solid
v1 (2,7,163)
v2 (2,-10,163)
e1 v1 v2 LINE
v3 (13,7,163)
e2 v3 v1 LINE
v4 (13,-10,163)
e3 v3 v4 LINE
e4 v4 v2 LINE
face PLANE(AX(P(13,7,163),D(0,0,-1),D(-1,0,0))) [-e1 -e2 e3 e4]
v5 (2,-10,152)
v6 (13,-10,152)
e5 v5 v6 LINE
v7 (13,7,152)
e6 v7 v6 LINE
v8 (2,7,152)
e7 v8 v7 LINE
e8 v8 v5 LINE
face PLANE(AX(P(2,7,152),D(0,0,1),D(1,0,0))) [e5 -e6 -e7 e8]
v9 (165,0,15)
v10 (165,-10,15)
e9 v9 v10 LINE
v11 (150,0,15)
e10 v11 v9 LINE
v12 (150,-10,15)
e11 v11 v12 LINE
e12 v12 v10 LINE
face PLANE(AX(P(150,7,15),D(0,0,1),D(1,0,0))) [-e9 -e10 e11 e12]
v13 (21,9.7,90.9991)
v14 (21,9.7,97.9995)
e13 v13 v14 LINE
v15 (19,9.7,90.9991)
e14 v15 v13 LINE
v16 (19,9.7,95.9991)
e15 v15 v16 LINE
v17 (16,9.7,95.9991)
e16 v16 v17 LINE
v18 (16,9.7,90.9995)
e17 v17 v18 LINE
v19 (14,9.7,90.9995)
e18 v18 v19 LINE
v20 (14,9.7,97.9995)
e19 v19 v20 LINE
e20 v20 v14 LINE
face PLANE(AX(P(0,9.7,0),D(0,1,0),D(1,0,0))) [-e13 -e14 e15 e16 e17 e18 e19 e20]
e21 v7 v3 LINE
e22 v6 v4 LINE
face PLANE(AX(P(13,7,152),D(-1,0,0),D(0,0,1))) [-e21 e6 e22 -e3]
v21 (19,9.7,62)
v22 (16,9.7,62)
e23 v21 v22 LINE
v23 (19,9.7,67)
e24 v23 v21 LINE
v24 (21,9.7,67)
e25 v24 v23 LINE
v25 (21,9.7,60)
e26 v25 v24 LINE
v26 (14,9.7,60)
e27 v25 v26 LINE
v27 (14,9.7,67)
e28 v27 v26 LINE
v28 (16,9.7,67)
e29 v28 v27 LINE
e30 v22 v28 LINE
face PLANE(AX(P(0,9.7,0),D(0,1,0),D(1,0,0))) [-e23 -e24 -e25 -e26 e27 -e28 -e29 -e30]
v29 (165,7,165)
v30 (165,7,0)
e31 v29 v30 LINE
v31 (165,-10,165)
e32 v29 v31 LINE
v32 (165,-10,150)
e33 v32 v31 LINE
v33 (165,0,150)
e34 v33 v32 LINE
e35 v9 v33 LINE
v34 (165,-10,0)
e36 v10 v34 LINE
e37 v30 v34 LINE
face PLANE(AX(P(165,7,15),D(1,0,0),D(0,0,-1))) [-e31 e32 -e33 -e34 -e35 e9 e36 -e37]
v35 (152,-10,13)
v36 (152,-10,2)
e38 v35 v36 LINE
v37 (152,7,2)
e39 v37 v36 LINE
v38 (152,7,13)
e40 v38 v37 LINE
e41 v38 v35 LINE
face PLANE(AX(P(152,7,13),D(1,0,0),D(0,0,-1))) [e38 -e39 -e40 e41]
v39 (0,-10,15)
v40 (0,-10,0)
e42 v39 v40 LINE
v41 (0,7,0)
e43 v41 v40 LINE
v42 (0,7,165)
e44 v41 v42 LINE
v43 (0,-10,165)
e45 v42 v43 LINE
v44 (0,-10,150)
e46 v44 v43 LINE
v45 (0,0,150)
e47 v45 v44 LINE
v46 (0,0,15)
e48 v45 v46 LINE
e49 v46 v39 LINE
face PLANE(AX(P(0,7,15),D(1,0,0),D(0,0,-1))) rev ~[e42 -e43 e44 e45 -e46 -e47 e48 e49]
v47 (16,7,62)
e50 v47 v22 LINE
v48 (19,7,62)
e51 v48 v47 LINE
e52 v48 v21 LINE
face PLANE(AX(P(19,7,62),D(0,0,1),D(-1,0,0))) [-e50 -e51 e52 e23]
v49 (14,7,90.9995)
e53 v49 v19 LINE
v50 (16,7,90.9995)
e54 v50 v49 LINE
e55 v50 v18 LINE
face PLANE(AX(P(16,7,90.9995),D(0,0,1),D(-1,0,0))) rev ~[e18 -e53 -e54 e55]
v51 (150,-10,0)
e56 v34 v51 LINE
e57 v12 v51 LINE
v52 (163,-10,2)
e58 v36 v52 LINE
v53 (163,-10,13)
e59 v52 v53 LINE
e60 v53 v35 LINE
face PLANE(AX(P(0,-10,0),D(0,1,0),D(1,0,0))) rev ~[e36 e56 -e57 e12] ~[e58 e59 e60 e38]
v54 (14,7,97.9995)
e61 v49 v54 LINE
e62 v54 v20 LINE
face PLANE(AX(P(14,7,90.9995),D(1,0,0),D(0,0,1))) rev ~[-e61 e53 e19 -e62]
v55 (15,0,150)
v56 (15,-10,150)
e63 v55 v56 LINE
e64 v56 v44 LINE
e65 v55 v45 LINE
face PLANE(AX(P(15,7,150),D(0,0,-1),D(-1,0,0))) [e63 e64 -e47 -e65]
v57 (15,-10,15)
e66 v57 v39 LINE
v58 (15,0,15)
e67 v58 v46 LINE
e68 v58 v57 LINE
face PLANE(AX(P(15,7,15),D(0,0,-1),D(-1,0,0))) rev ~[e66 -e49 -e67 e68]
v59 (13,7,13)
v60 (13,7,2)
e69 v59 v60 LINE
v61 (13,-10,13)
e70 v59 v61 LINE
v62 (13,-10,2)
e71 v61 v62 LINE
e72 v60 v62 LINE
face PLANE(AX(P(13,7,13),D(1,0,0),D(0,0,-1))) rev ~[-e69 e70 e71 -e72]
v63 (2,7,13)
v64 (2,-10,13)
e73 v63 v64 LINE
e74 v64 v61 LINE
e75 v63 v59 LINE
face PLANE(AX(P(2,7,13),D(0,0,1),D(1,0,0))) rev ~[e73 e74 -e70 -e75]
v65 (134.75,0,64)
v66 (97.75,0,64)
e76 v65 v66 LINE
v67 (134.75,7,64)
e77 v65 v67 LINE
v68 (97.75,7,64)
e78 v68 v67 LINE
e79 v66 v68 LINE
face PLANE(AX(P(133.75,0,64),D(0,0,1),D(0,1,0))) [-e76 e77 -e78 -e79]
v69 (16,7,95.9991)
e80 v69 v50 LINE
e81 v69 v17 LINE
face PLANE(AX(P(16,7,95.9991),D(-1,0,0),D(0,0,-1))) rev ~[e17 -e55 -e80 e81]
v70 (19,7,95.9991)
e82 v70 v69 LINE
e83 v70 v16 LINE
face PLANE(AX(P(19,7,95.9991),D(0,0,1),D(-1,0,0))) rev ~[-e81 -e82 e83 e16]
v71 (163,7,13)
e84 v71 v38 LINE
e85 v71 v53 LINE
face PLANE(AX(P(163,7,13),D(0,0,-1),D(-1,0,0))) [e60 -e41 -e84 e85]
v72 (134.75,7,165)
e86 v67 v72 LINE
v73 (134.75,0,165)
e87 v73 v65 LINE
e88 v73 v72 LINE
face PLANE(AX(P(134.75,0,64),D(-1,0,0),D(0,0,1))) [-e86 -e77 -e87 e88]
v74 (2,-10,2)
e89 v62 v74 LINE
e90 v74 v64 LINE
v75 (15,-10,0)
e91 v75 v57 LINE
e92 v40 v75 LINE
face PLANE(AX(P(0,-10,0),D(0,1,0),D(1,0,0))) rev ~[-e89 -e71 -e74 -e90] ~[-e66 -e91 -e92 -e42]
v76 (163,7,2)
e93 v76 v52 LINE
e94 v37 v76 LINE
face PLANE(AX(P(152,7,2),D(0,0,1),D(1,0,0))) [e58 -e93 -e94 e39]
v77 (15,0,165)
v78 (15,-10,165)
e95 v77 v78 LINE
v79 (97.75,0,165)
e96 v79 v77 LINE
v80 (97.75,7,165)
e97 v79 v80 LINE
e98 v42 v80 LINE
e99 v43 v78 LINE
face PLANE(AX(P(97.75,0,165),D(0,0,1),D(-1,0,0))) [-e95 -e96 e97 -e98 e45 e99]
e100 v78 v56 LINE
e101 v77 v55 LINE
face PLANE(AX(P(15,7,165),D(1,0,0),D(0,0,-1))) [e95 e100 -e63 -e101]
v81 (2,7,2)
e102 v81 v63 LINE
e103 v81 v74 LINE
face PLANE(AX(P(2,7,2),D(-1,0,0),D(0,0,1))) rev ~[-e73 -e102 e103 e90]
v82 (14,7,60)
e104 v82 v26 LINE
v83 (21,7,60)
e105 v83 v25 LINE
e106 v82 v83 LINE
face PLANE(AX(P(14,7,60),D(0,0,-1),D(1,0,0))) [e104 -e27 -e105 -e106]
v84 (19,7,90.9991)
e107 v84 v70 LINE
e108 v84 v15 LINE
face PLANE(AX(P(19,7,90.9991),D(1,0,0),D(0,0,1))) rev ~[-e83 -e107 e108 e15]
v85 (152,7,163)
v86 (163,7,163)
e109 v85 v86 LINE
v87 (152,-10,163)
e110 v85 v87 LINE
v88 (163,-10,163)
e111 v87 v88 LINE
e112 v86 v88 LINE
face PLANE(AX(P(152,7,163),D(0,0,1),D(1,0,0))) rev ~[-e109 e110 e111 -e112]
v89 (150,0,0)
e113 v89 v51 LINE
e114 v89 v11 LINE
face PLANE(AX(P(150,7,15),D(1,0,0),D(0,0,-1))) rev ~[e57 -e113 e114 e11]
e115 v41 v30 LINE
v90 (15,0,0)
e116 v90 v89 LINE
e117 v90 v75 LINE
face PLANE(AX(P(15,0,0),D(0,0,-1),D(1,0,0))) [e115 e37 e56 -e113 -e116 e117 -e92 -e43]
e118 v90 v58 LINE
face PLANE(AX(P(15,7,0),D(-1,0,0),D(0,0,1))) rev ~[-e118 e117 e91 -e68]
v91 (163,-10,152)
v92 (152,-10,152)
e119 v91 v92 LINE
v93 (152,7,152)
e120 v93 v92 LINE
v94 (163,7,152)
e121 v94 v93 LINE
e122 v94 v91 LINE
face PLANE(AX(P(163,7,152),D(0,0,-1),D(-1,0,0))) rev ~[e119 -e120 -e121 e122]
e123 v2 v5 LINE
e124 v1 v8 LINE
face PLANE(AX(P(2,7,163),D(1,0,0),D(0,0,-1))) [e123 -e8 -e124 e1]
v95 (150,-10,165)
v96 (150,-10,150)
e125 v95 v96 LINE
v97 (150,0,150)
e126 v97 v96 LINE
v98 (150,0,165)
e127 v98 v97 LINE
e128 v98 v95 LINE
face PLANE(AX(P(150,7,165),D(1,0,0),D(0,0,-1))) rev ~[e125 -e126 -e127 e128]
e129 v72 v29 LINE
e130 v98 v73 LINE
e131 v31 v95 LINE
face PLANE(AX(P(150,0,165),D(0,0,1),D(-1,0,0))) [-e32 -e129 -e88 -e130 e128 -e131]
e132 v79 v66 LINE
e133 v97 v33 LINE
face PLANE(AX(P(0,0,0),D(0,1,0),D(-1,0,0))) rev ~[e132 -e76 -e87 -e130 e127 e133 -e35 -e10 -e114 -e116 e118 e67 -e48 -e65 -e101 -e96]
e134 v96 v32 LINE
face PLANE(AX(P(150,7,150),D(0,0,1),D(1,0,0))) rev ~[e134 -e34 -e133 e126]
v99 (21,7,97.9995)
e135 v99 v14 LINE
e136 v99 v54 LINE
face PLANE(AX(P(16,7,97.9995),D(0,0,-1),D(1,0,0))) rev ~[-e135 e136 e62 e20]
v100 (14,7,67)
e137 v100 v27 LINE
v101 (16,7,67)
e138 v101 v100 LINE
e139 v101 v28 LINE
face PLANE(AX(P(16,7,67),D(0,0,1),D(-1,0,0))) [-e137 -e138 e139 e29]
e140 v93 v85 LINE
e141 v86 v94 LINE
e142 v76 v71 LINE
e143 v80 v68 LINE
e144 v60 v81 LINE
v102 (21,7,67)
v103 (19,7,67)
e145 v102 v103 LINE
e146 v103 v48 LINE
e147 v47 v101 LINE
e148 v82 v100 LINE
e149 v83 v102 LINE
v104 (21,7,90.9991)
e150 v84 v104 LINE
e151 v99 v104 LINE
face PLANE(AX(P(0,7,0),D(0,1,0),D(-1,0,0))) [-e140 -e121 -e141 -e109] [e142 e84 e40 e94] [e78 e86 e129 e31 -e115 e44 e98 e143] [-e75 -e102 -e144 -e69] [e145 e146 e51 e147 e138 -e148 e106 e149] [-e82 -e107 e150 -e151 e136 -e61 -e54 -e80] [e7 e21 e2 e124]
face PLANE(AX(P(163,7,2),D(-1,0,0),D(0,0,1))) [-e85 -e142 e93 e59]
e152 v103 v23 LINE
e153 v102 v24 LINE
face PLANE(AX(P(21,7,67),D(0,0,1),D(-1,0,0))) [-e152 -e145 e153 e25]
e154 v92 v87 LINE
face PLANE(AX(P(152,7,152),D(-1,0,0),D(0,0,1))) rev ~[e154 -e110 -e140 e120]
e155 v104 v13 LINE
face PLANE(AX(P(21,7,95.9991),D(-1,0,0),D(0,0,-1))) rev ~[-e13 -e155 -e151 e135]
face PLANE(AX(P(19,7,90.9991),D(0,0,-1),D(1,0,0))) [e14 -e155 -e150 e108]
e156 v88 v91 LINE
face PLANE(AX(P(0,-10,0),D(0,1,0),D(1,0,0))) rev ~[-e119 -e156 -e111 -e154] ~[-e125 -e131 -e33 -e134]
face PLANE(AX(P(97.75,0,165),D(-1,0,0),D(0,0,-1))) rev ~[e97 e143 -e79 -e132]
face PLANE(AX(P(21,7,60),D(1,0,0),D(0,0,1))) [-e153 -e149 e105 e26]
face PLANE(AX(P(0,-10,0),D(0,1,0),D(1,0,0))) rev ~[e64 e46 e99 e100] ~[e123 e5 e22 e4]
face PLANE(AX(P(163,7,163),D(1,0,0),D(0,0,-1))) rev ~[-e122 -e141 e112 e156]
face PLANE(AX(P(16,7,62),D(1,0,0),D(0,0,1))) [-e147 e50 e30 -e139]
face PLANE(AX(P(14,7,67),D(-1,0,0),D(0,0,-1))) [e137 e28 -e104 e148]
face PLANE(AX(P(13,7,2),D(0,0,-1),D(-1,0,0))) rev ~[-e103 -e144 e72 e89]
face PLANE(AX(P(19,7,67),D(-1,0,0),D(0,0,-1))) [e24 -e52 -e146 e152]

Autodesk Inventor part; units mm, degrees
ref_plane "YZ Plane" through (0, 0, 0) normal (1, 0, 0) x (0, 1, 0)
ref_plane "XZ Plane" through (0, 0, 0) normal (0, 1, 0) x (-1, 0, 0)
ref_plane "XY Plane" through (0, 0, 0) normal (0, 0, 1) x (1, 0, 0)
sketch "Sketch1" plane through (0, 0, 0) normal (0, 1, 0) x (-1, 0, 0)
  line L0 (0, 0) -> (-165, 0)
  line L1 (-165, 0) -> (-165, 165)
  line L2 (-165, 165) -> (0, 165)
  line L3 (0, 165) -> (0, 0)
  line L4 (-165, 165) -> (-150, 165)
  line L5 (-165, 150) -> (-165, 165)
  line L6 (-163, 152) -> (-152, 152)
  line L7 (-152, 152) -> (-152, 163)
  line L8 (-152, 163) -> (-163, 163)
  line L9 (-163, 163) -> (-163, 152)
  line L10 (-2, 152) -> (-13, 152)
  line L11 (-13, 152) -> (-13, 163)
  line L12 (-13, 163) -> (-2, 163)
  line L13 (-2, 163) -> (-2, 152)
  line L14 (-163, 13) -> (-152, 13)
  line L15 (-152, 13) -> (-152, 2)
  line L16 (-152, 2) -> (-163, 2)
  line L17 (-163, 2) -> (-163, 13)
  line L18 (-2, 13) -> (-13, 13)
  line L19 (-13, 13) -> (-13, 2)
  line L20 (-13, 2) -> (-2, 2)
  line L21 (-2, 2) -> (-2, 13)
  line L22 (-150, 150) -> (-165, 150)
  line L23 (-165, 150) -> (-165, 165)
  line L24 (-165, 165) -> (-150, 165)
  line L25 (-150, 165) -> (-150, 150)
  line L26 (-150, 15) -> (-165, 15)
  line L27 (-165, 15) -> (-165, 0)
  line L28 (-165, 0) -> (-150, 0)
  line L29 (-150, 0) -> (-150, 15)
  line L30 (-15, 15) -> (0, 15)
  line L31 (0, 15) -> (0, 0)
  line L32 (0, 0) -> (-15, 0)
  line L33 (-15, 0) -> (-15, 15)
  line L34 (-15, 150) -> (0, 150)
  line L35 (0, 150) -> (0, 165)
  line L36 (0, 165) -> (-15, 165)
  line L37 (-15, 165) -> (-15, 150)
  line L38 (-165, 165) -> (-133.75, 165)
  line L39 (-133.75, 165) -> (-97.75, 165)
  line L40 (-97.75, 165) -> (-97.75, 64)
  line L41 (-97.75, 64) -> (-133.75, 64)
  line L42 (-133.75, 64) -> (-133.75, 165)
  point P0 (0, 15)
  dimension "d0" = 165
  dimension "d1" = 165
  dimension "d5" = 2
  dimension "d6" = 2
  dimension "d7" = 2
  dimension "d8" = 2
  dimension "d9" = 31.25
  dimension "d10" = 36
  dimension "d11" = 101
extrude "Extrusion1" add sketch "Sketch1" along normal blind 7 contours L0 L29 L26 L1 L22 L25 L2 L42 L41 L40 L37 L34 L3 L30 L33
sketch "Sketch2" plane through (0, 7, 0) normal (0, 1, 0) x (1, 0, 0)
  line L0 (15, -15) -> (0, -15) projected
  line L1 (15, -15) -> (0, -15)
  line L2 (0, -15) -> (0, 0)
  line L3 (0, 0) -> (15, 0)
  line L4 (15, 0) -> (15, -15)
  line L5 (150, -15) -> (150, 0) projected
  line L6 (150, -15) -> (165, -15)
  line L7 (165, -15) -> (165, 0)
  line L8 (165, 0) -> (150, 0)
  line L9 (150, 0) -> (150, -15)
  line L10 (150, -150) -> (165, -150) projected
  line L11 (150, -150) -> (165, -150)
  line L12 (165, -150) -> (165, -165)
  line L13 (165, -165) -> (150, -165)
  line L14 (150, -165) -> (150, -150)
  line L15 (15, -150) -> (0, -150)
  line L16 (0, -150) -> (0, -165)
  line L17 (0, -165) -> (15, -165)
  line L18 (15, -165) -> (15, -150)
  line L19 (2, -163) -> (2, -152)
  line L20 (2, -152) -> (13, -152)
  line L21 (13, -152) -> (13, -163)
  line L22 (13, -163) -> (2, -163)
  line L23 (2, -2) -> (2, -13)
  line L24 (2, -13) -> (13, -13)
  line L25 (13, -13) -> (13, -2)
  line L26 (13, -2) -> (2, -2)
  line L27 (163, -2) -> (163, -13)
  line L28 (163, -13) -> (152, -13)
  line L29 (152, -13) -> (152, -2)
  line L30 (152, -2) -> (163, -2)
  line L31 (163, -163) -> (163, -152)
  line L32 (163, -152) -> (152, -152)
  line L33 (152, -152) -> (152, -163)
  line L34 (152, -163) -> (163, -163)
  dimension "d14" = 15
  dimension "d15" = 15
  dimension "d16" = 15
  dimension "d17" = 15
  dimension "d18" = 15
  dimension "d19" = 15
  dimension "d20" = 15
  dimension "d21" = 15
  dimension "d22" = 2
  dimension "d23" = 2
  dimension "d24" = 2
  dimension "d25" = 2
extrude "Extrusion2" add sketch "Sketch2" against normal blind 17
sketch "Sketch3" plane through (0, 7, 0) normal (0, 1, 0) x (1, 0, 0)
  point P0 (0, 0)
surface extrude "ExtrusionSrf1" sketch "Sketch2" against normal blind 37 shown yes curves L21 L22 L19 L20
surface extrude "ExtrusionSrf2" sketch "Sketch2" against normal blind 37 shown yes curves L27 L28 L29 L30
surface extrude "ExtrusionSrf3" sketch "Sketch2" against normal blind 37 shown yes curves L25 L26 L23 L24
surface extrude "ExtrusionSrf4" sketch "Sketch2" against normal blind 37 shown yes curves L31 L32 L33 L34
sketch "Sketch4" plane through (133.75, 0, 64) normal (-1, 0, 0) x (0, 0, 1)
  line L0 (0, 7) -> (101, 7) projected
  line L1 (101, 0) -> (101, 7) projected
  line L2 (0, 7) -> (101, 7)
  line L3 (101, 7) -> (101, 0)
  line L4 (101, 0) -> (0, 0)
  line L5 (0, 0) -> (0, 7)
  line L6 (0, 0) -> (0, 7) projected
  line L7 (0, 7) -> (101, 7)
  line L8 (101, 7) -> (101, 0)
  line L9 (101, 0) -> (0, 0)
  line L10 (0, 0) -> (0, 7)
  point P0 (-64, 0)
extrude "Extrusion3" cut sketch "Sketch4" against normal blind 1
sketch "Sketch5" plane through (0, 7, 0) normal (0, 1, 0) x (1, 0, 0)
  line L0 (13, -2) -> (13, -13) projected
  line L1 (0, 0) -> (0, -165) projected
  line L2 (16, -67) -> (19, -67)
  line L3 (19, -67) -> (19, -62)
  line L4 (19, -62) -> (16, -62)
  line L5 (16, -62) -> (16, -67)
  line L6 (21, -60) -> (21, -67)
  line L7 (14, -67) -> (14, -60)
  line L8 (14, -60) -> (21, -60)
  line L9 (21, -67) -> (14, -67)
  line L10 (19, -90.9991) -> (19, -95.9991)
  line L11 (19, -95.9991) -> (16, -95.9991)
  line L12 (16, -95.9991) -> (16, -90.9995)
  line L13 (21, -97.9995) -> (21, -90.9991)
  line L14 (14, -90.9995) -> (14, -97.9995)
  line L15 (14, -97.9995) -> (21, -97.9995)
  line L16 (19, -90.9991) -> (19, -95.9991)
  line L17 (16, -95.9991) -> (16, -90.9995)
  line L18 (14, -90.9995) -> (14, -97.9995)
  line L19 (21, -97.9995) -> (21, -90.9991)
  line L20 (19, -67) -> (21, -67)
  line L21 (21, -60) -> (14, -60)
  line L22 (14, -67) -> (16, -67)
  line L23 (16, -62) -> (19, -62)
  line L24 (19, -90.9991) -> (21, -90.9991)
  line L25 (16, -90.9995) -> (14, -90.9995)
  line L26 (14, -97.9995) -> (16, -97.9995)
  line L27 (16, -97.9995) -> (16, -90.9995)
  line L28 (16, -90.9995) -> (14, -90.9995)
  line L29 (14, -90.9995) -> (14, -97.9995)
  line L30 (16, -97.9995) -> (21, -97.9995)
  line L31 (21, -97.9995) -> (21, -95.9991)
  line L32 (21, -95.9991) -> (16, -95.9991)
  line L33 (16, -95.9991) -> (16, -97.9995)
  line L34 (21, -90.9991) -> (19, -90.9991)
  line L35 (19, -90.9991) -> (19, -95.9991)
  line L36 (19, -95.9991) -> (21, -95.9991)
  line L37 (21, -95.9991) -> (21, -90.9991)
  line L38 (19, -67) -> (21, -67)
  line L39 (21, -67) -> (21, -60)
  line L40 (21, -60) -> (19, -60)
  line L41 (19, -60) -> (19, -67)
  line L42 (19, -60) -> (14, -60)
  line L43 (14, -60) -> (14, -62)
  line L44 (14, -62) -> (19, -62)
  line L45 (19, -62) -> (19, -60)
  line L46 (16, -62) -> (14, -62)
  line L47 (14, -62) -> (14, -67)
  line L48 (14, -67) -> (16, -67)
  line L49 (16, -67) -> (16, -62)
  dimension "d42" = 3
  dimension "d43" = 5
  dimension "d44" = 2
extrude "Extrusion4" add sketch "Sketch5" along normal blind 2.7 contours L9 L7 L44 L5 | L3 L41 L8 L6 L9 | L44 L7 L8 L41 L4 | L24 L13 L32 L10 | L32 L13 L15 L27 L11 | L27 L15 L14 L25 L12
properties part number "piano superiore"
